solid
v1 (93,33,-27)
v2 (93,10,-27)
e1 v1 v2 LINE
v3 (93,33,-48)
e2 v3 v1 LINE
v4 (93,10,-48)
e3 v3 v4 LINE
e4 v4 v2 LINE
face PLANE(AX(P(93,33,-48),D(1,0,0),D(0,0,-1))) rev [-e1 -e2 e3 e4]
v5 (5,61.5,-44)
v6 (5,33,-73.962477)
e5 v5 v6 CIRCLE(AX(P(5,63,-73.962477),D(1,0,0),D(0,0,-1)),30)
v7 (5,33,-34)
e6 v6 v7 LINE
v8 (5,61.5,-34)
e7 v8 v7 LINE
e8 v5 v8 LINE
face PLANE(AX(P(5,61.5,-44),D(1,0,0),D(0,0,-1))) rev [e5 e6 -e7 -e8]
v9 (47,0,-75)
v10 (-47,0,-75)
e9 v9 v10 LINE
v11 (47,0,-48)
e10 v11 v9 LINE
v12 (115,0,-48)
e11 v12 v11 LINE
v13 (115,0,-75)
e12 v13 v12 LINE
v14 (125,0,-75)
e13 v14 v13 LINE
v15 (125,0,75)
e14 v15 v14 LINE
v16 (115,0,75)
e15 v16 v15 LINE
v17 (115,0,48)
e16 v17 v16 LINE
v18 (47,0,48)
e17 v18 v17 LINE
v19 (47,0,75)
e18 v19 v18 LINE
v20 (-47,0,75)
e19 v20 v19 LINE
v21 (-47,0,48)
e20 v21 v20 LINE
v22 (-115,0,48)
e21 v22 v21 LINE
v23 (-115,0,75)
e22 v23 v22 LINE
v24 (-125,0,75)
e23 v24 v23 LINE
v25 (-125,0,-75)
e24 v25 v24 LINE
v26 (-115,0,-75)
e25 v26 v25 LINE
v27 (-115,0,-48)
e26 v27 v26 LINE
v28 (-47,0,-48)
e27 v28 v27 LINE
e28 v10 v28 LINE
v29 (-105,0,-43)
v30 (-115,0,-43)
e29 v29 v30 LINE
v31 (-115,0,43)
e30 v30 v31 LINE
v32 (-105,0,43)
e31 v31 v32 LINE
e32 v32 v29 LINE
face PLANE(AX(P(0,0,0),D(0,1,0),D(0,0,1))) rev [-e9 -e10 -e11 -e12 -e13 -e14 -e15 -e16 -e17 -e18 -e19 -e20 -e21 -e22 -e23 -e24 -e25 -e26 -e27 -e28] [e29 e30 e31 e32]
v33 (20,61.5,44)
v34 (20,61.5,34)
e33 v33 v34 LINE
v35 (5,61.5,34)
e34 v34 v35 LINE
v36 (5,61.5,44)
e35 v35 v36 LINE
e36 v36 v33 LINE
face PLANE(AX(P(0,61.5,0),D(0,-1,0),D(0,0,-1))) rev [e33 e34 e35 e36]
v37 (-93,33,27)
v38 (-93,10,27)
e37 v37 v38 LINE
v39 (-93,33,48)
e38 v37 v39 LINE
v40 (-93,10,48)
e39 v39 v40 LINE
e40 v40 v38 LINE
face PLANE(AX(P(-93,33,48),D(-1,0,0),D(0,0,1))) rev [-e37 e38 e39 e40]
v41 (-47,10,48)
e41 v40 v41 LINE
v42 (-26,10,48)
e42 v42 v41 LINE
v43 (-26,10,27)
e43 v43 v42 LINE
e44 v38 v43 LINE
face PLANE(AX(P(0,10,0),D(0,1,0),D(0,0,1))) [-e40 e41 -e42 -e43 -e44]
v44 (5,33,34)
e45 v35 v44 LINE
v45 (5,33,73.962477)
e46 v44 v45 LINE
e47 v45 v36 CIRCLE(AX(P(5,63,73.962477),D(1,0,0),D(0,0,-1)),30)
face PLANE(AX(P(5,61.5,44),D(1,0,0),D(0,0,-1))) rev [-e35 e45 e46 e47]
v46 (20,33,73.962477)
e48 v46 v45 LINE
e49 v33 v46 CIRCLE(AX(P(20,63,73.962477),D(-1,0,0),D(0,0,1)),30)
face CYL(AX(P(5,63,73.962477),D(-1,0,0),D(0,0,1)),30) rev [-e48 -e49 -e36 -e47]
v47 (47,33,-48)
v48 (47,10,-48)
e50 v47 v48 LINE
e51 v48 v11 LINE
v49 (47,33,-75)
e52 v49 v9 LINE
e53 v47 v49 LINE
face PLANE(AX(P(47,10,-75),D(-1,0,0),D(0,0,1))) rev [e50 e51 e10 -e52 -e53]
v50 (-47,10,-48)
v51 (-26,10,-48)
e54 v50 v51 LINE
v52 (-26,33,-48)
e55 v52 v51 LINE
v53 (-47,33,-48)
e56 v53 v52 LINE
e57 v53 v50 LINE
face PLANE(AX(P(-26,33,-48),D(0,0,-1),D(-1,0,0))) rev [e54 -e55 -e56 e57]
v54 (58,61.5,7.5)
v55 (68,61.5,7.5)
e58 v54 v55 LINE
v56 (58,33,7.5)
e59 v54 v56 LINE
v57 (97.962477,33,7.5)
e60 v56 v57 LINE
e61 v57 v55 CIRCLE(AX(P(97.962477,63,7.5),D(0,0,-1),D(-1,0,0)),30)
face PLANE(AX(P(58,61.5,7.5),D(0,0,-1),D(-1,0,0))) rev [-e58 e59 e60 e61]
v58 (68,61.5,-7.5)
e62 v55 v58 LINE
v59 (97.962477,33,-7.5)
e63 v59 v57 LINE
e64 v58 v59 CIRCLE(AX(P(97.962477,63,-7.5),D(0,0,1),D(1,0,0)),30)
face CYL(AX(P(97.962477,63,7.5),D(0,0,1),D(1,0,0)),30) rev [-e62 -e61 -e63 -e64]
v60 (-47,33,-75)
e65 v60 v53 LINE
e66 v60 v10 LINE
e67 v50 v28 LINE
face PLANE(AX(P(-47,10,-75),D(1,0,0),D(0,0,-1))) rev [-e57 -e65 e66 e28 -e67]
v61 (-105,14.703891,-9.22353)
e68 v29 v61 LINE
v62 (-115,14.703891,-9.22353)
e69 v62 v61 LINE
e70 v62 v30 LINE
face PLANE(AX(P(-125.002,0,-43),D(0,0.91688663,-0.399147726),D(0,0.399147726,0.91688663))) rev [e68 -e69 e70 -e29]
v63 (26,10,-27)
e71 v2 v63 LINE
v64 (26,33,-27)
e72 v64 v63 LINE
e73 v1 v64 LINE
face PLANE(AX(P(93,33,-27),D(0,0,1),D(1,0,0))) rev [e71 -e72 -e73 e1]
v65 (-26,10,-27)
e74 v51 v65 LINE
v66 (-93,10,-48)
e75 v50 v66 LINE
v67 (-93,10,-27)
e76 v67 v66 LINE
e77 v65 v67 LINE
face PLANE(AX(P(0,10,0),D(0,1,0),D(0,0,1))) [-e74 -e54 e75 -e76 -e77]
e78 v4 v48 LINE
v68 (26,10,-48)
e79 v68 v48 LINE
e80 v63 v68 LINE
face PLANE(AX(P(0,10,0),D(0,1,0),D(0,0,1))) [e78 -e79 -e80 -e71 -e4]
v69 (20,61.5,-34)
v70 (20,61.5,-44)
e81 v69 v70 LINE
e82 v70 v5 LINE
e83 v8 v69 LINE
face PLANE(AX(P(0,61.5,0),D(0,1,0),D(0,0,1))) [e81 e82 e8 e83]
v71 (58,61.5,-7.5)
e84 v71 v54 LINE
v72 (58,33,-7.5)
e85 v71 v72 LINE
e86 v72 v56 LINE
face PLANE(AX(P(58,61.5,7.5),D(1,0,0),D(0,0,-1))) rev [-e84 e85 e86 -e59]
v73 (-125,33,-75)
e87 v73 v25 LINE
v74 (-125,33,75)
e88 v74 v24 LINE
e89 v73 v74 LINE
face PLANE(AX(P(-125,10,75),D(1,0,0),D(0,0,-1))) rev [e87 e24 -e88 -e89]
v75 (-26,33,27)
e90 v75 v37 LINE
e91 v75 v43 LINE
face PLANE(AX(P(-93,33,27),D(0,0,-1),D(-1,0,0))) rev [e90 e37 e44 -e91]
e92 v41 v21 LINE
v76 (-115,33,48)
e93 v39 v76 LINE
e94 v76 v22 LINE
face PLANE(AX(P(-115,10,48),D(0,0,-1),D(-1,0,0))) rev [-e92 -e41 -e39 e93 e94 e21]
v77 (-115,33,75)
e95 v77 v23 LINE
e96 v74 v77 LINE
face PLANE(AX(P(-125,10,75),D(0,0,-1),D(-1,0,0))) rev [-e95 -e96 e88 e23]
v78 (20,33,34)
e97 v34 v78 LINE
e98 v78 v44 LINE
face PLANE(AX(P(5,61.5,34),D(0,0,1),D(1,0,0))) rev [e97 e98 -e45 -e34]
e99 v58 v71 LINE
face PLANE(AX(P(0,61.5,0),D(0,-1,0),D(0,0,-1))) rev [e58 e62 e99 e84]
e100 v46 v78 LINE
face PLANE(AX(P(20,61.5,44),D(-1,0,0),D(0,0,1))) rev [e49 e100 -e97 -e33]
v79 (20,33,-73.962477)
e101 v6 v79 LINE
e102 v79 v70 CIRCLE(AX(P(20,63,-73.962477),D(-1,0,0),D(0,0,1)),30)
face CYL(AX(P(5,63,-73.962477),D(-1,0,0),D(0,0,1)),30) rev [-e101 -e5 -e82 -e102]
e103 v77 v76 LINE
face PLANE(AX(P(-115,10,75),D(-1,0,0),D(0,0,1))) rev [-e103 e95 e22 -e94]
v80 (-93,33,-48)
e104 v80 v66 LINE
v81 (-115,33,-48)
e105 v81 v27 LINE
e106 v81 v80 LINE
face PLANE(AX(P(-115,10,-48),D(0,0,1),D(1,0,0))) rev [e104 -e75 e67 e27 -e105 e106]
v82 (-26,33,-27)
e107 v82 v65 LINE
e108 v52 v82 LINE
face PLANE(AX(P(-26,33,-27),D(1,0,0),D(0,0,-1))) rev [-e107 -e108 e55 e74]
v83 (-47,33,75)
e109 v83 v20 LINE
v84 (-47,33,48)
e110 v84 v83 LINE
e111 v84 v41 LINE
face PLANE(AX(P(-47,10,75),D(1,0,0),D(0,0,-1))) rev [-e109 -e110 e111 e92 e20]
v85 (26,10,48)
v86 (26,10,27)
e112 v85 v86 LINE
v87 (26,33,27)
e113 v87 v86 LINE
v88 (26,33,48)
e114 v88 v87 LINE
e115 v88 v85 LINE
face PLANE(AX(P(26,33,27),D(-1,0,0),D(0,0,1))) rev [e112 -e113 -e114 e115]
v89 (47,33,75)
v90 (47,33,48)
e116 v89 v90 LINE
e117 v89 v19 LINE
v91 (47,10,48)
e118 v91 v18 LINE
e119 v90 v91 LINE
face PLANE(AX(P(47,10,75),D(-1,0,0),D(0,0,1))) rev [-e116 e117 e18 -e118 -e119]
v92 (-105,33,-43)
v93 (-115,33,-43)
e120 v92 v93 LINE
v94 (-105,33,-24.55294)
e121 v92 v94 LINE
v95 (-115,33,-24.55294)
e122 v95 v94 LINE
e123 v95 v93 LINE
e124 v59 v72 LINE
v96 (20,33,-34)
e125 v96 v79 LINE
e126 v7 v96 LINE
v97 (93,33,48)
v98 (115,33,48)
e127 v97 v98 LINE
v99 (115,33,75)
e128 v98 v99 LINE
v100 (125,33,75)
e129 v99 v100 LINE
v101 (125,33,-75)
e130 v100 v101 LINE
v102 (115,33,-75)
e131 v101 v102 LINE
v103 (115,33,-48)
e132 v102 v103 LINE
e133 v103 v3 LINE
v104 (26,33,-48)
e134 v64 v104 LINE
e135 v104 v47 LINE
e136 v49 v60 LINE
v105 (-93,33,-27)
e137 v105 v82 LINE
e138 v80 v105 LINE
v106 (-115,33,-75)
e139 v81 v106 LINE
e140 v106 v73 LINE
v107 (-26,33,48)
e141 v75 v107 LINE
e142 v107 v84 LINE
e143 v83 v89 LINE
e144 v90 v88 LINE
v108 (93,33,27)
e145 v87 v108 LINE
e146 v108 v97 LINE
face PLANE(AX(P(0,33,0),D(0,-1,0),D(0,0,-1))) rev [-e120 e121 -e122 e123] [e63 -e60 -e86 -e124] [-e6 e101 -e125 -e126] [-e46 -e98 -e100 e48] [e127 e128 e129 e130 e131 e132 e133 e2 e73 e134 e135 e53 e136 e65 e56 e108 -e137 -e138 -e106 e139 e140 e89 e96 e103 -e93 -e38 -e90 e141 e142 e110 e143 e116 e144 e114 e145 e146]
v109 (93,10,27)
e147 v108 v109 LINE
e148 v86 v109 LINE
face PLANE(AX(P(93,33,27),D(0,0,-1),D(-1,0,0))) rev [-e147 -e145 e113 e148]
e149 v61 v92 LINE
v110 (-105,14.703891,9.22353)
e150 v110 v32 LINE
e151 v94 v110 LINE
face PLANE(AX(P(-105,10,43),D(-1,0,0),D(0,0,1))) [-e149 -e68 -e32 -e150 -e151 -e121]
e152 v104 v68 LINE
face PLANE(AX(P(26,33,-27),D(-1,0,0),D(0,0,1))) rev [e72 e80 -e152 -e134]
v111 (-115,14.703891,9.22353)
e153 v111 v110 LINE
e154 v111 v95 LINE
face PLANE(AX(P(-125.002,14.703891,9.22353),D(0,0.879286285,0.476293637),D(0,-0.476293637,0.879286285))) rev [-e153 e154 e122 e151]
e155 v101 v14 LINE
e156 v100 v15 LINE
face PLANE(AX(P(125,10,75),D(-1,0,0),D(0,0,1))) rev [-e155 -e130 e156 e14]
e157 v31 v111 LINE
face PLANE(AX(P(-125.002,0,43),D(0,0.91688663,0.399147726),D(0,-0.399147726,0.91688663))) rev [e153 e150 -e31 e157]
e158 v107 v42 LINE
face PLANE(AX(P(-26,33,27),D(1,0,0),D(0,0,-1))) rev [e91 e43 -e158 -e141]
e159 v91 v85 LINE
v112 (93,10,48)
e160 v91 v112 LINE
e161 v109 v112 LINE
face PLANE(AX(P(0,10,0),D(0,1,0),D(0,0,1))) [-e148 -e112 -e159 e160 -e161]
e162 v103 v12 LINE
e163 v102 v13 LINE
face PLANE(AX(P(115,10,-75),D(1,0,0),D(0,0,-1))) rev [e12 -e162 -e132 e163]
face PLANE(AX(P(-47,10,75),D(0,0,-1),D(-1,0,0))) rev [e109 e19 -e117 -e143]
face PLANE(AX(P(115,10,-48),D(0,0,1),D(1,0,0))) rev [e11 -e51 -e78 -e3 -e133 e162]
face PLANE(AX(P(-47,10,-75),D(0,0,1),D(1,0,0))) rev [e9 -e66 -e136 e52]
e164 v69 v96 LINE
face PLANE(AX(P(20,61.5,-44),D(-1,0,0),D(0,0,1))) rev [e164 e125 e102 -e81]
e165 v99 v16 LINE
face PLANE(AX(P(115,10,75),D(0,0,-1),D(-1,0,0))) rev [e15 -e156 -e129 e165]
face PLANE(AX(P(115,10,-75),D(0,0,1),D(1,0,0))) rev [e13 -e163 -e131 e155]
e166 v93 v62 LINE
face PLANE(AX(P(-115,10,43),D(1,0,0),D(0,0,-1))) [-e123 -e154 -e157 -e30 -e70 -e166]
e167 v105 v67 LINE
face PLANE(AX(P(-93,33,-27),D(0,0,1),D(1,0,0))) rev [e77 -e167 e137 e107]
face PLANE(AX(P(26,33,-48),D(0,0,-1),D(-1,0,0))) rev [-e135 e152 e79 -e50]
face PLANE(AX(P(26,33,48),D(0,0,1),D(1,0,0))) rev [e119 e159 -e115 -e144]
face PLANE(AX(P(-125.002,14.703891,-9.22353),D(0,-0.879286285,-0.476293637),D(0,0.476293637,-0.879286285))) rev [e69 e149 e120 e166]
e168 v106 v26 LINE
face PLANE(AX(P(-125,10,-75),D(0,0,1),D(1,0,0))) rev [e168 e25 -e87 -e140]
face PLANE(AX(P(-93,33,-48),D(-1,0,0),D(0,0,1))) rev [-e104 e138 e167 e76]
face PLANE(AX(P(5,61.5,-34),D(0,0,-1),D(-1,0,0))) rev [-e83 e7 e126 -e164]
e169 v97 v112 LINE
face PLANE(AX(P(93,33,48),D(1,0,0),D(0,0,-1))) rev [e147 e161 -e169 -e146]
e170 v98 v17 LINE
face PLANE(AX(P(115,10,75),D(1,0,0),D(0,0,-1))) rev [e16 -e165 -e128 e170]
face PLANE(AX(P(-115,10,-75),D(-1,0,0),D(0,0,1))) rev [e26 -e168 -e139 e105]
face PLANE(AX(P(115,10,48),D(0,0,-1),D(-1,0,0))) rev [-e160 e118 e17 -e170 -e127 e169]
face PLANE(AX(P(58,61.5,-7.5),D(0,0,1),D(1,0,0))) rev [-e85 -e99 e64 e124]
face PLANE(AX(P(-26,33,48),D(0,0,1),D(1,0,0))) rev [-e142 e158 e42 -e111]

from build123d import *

# Parameters (mm, degrees)
SKETCH2_W                = 10
SKETCH2_H                = 86
BOSS_EXTRUDE1_DEPTH      = 10
SKETCH3_W                = 10
SKETCH3_H                = 86
BOSS_EXTRUDE2_DEPTH      = 23
BOSS_EXTRUDE3_REACH      = 246.16
BOSS_EXTRUDE4_DEPTH      = 100
BOSS_EXTRUDE4_DEPTH_BACK = 5
SKETCH5_R                = 47.55
SKETCH7_W                = 10
SKETCH7_H                = 18.447060317
BOSS_EXTRUDE6_DEPTH      = 30
CUT_EXTRUDE2_DEPTH       = 10
BOSS_EXTRUDE7_REACH      = 275.742
SKETCH6_R                = 45.55
CUT_EXTRUDE1_DEPTH       = 100
SKETCH10_W               = 15
SKETCH10_H               = 10
SKETCH10_W_2             = 10
SKETCH10_H_2             = 15
BOSS_EXTRUDE8_DEPTH      = 28.5
FILLET1_R                = 30
FILLET2_R                = 30
FILLET3_R                = 30
SKETCH11_W               = 111.971085125
SKETCH11_H               = 99.425275067
CUT_EXTRUDE3_DEPTH       = 234.52646531


with BuildPart() as part:
    # Sketch2 → Boss-Extrude1 (new body)
    with BuildSketch(Plane(origin=(0, 0, 0), x_dir=(1, 0, 0), z_dir=(0, 1, 0))):
        Polygon((-125, -75), (-115, -75), (-115, -48), (-47, -48), (-47, -75), (47, -75), (47, -48), (115, -48), (115, -75), (125, -75), (125, 75), (115, 75), (115, 48), (47, 48), (47, 75), (-47, 75), (-47, 48), (-115, 48), (-115, 75), (-125, 75), align=None)
        with Locations((-110, 0)):
            Rectangle(SKETCH2_W, SKETCH2_H, mode=Mode.SUBTRACT)
    extrude(amount=BOSS_EXTRUDE1_DEPTH)

    # Sketch3 → Boss-Extrude2 (add)
    with BuildSketch(Plane(origin=(0, 10, 0), x_dir=(1, 0, 0), z_dir=(0, 1, 0))):
        Polygon((-47, 48), (-47, 75), (47, 75), (47, 48), (26, 48), (26, 27), (93, 27), (93, 48), (115, 48), (115, 75), (125, 75), (125, -75), (115, -75), (115, -48), (93, -48), (93, -27), (26, -27), (26, -48), (47, -48), (47, -75), (-47, -75), (-47, -48), (-26, -48), (-26, -27), (-93, -27), (-93, -48), (-115, -48), (-115, -75), (-125, -75), (-125, 75), (-115, 75), (-115, 48), (-93, 48), (-93, 27), (-26, 27), (-26, 48), align=None)
        with Locations((-110, 0)):
            Rectangle(SKETCH3_W, SKETCH3_H, mode=Mode.SUBTRACT)
    extrude(amount=BOSS_EXTRUDE2_DEPTH)

    # Sketch4 → Boss-Extrude3 (add, up to next)
    with BuildSketch(Plane.ZY.offset(105), mode=Mode.PRIVATE) as boss_extrude3_sk1:
        Polygon((-43, 0), (-9.223530158, 14.703891082), (-43, 33), align=None)
    boss_extrude3_tool1 = extrude(boss_extrude3_sk1.sketch, amount=BOSS_EXTRUDE3_REACH, mode=Mode.PRIVATE) - part.part
    # Sketch4 → Boss-Extrude3 (add, up to next)
    with BuildSketch(Plane.ZY.offset(105), mode=Mode.PRIVATE) as boss_extrude3_sk2:
        Polygon((43, 0), (9.223530158, 14.703891082), (-24.552939683, 33), (43, 33), align=None)
    boss_extrude3_tool2 = extrude(boss_extrude3_sk2.sketch, amount=BOSS_EXTRUDE3_REACH, mode=Mode.PRIVATE) - part.part
    add(boss_extrude3_tool1.solids().sort_by_distance((-105, 15.901297, -31.741177))[0])
    add(boss_extrude3_tool2.solids().sort_by_distance((-105, 21.685197, 19.901194))[0])



with BuildPart() as body_2:
    # Sketch5 → Boss-Extrude4 (new, two sides: drawn at the far end of the back side and taken through both)
    with BuildSketch(Plane(origin=(-115, 0, 0), x_dir=(0, 0, -1), z_dir=(1, 0, 0)).offset(-BOSS_EXTRUDE4_DEPTH_BACK)):
        with Locations((0, 80.55)):
            Circle(SKETCH5_R)
    extrude(amount=BOSS_EXTRUDE4_DEPTH + BOSS_EXTRUDE4_DEPTH_BACK)


with BuildPart() as part_1:
    add(part.part)

    add(body_2.part)  # Boss-Extrude6 merges body 2
    # Sketch7 → Boss-Extrude6 (add)
    with BuildSketch(Plane(origin=(0, 33, 0), x_dir=(1, 0, 0), z_dir=(0, 1, 0))):
        Polygon((-120, 0), (-120, 48), (-93, 48), (-93, 27), (-15, 27), (-15, -27), (-93, -27), (-93, -48), (-120, -48), align=None)
        with Locations((-110, 33.776469842)):
            Rectangle(SKETCH7_W, SKETCH7_H, mode=Mode.SUBTRACT)
    extrude(amount=BOSS_EXTRUDE6_DEPTH)

    # Sketch8 → Cut-Extrude2 (cut)
    with BuildSketch(Plane.ZY.offset(105)):
        Polygon((-43, 46.626077643), (-41.871641374, 62.212018017), (-24.552939683, 62.212018017), (-24.552939683, 33), (-43, 33), align=None)
    extrude(amount=CUT_EXTRUDE2_DEPTH, mode=Mode.SUBTRACT)

    # Sketch9 → Boss-Extrude7 (add, up to next)
    with BuildSketch(Plane.ZY.offset(105), mode=Mode.PRIVATE) as boss_extrude7_sk1:
        Polygon((-42.138917347, 58.520153318), (-43, 46.626077643), (-43, 62.212018017), (-41.871641374, 62.212018017), align=None)
    boss_extrude7_tool1 = extrude(boss_extrude7_sk1.sketch, amount=BOSS_EXTRUDE7_REACH, mode=Mode.PRIVATE) - part_1.part
    add(boss_extrude7_tool1.solids().sort_by_distance((-105, 57.016705, -42.62388))[0])

    # Sketch6 → Cut-Extrude1 (cut)
    with BuildSketch(Plane(origin=(-15, 0, 0), x_dir=(0, 0, -1), z_dir=(1, 0, 0))):
        with Locations((0, 80.55)):
            Circle(SKETCH6_R)
    extrude(amount=-CUT_EXTRUDE1_DEPTH, mode=Mode.SUBTRACT)

    # Sketch10 → Boss-Extrude8 (add)
    with BuildSketch(Plane(origin=(0, 33, 0), x_dir=(1, 0, 0), z_dir=(0, 1, 0))):
        with Locations((12.5, 39)):
            Rectangle(SKETCH10_W, SKETCH10_H)
        with Locations((12.5, -39)):
            Rectangle(SKETCH10_W, SKETCH10_H)
        with Locations((63, 0)):
            Rectangle(SKETCH10_W_2, SKETCH10_H_2)
    extrude(amount=BOSS_EXTRUDE8_DEPTH)

    # Fillet1
    # the kernel refuses this fillet: 30 mm, written as the material it adds along each edge
    with BuildSketch(Plane(origin=(5, 33, 44), x_dir=(0, 0, 1), z_dir=(1, 0, 0))) as fillet1_piece_1:
        with BuildLine():
            CenterArc((29.962476533, -30), FILLET1_R, 90, 87.134016017)
            Line((0, -28.5), (0, 0))
            Line((0, 0), (29.962476533, 0))
        make_face()
    extrude(amount=15)

    # Fillet2
    # the kernel refuses this fillet: 30 mm, written as the material it adds along each edge
    with BuildSketch(Plane(origin=(20, 33, -44), x_dir=(0, 0, -1), z_dir=(-1, 0, 0))) as fillet2_piece_1:
        with BuildLine():
            CenterArc((29.962476533, -30), FILLET2_R, 90, 87.134016017)
            Line((0, -28.5), (0, 0))
            Line((0, 0), (29.962476533, 0))
        make_face()
    extrude(amount=15)

    # Fillet3
    # the kernel refuses this fillet: 30 mm, written as the material it adds along each edge
    with BuildSketch(Plane(origin=(68, 33, 7.5), x_dir=(1, 0, 0), z_dir=(0, 0, -1))) as fillet3_piece_1:
        with BuildLine():
            CenterArc((29.962476533, -30), FILLET3_R, 90, 87.134016017)
            Line((0, -28.5), (0, 0))
            Line((0, 0), (29.962476533, 0))
        make_face()
    extrude(amount=15)

    # Sketch11 → Cut-Extrude3 (cut, through all)
    with BuildSketch(Plane.XY.offset(75)):
        with Locations((-64.014457438, 82.712637534)):
            Rectangle(SKETCH11_W, SKETCH11_H)
    extrude(amount=-CUT_EXTRUDE3_DEPTH, mode=Mode.SUBTRACT)


solid = part_1.part
